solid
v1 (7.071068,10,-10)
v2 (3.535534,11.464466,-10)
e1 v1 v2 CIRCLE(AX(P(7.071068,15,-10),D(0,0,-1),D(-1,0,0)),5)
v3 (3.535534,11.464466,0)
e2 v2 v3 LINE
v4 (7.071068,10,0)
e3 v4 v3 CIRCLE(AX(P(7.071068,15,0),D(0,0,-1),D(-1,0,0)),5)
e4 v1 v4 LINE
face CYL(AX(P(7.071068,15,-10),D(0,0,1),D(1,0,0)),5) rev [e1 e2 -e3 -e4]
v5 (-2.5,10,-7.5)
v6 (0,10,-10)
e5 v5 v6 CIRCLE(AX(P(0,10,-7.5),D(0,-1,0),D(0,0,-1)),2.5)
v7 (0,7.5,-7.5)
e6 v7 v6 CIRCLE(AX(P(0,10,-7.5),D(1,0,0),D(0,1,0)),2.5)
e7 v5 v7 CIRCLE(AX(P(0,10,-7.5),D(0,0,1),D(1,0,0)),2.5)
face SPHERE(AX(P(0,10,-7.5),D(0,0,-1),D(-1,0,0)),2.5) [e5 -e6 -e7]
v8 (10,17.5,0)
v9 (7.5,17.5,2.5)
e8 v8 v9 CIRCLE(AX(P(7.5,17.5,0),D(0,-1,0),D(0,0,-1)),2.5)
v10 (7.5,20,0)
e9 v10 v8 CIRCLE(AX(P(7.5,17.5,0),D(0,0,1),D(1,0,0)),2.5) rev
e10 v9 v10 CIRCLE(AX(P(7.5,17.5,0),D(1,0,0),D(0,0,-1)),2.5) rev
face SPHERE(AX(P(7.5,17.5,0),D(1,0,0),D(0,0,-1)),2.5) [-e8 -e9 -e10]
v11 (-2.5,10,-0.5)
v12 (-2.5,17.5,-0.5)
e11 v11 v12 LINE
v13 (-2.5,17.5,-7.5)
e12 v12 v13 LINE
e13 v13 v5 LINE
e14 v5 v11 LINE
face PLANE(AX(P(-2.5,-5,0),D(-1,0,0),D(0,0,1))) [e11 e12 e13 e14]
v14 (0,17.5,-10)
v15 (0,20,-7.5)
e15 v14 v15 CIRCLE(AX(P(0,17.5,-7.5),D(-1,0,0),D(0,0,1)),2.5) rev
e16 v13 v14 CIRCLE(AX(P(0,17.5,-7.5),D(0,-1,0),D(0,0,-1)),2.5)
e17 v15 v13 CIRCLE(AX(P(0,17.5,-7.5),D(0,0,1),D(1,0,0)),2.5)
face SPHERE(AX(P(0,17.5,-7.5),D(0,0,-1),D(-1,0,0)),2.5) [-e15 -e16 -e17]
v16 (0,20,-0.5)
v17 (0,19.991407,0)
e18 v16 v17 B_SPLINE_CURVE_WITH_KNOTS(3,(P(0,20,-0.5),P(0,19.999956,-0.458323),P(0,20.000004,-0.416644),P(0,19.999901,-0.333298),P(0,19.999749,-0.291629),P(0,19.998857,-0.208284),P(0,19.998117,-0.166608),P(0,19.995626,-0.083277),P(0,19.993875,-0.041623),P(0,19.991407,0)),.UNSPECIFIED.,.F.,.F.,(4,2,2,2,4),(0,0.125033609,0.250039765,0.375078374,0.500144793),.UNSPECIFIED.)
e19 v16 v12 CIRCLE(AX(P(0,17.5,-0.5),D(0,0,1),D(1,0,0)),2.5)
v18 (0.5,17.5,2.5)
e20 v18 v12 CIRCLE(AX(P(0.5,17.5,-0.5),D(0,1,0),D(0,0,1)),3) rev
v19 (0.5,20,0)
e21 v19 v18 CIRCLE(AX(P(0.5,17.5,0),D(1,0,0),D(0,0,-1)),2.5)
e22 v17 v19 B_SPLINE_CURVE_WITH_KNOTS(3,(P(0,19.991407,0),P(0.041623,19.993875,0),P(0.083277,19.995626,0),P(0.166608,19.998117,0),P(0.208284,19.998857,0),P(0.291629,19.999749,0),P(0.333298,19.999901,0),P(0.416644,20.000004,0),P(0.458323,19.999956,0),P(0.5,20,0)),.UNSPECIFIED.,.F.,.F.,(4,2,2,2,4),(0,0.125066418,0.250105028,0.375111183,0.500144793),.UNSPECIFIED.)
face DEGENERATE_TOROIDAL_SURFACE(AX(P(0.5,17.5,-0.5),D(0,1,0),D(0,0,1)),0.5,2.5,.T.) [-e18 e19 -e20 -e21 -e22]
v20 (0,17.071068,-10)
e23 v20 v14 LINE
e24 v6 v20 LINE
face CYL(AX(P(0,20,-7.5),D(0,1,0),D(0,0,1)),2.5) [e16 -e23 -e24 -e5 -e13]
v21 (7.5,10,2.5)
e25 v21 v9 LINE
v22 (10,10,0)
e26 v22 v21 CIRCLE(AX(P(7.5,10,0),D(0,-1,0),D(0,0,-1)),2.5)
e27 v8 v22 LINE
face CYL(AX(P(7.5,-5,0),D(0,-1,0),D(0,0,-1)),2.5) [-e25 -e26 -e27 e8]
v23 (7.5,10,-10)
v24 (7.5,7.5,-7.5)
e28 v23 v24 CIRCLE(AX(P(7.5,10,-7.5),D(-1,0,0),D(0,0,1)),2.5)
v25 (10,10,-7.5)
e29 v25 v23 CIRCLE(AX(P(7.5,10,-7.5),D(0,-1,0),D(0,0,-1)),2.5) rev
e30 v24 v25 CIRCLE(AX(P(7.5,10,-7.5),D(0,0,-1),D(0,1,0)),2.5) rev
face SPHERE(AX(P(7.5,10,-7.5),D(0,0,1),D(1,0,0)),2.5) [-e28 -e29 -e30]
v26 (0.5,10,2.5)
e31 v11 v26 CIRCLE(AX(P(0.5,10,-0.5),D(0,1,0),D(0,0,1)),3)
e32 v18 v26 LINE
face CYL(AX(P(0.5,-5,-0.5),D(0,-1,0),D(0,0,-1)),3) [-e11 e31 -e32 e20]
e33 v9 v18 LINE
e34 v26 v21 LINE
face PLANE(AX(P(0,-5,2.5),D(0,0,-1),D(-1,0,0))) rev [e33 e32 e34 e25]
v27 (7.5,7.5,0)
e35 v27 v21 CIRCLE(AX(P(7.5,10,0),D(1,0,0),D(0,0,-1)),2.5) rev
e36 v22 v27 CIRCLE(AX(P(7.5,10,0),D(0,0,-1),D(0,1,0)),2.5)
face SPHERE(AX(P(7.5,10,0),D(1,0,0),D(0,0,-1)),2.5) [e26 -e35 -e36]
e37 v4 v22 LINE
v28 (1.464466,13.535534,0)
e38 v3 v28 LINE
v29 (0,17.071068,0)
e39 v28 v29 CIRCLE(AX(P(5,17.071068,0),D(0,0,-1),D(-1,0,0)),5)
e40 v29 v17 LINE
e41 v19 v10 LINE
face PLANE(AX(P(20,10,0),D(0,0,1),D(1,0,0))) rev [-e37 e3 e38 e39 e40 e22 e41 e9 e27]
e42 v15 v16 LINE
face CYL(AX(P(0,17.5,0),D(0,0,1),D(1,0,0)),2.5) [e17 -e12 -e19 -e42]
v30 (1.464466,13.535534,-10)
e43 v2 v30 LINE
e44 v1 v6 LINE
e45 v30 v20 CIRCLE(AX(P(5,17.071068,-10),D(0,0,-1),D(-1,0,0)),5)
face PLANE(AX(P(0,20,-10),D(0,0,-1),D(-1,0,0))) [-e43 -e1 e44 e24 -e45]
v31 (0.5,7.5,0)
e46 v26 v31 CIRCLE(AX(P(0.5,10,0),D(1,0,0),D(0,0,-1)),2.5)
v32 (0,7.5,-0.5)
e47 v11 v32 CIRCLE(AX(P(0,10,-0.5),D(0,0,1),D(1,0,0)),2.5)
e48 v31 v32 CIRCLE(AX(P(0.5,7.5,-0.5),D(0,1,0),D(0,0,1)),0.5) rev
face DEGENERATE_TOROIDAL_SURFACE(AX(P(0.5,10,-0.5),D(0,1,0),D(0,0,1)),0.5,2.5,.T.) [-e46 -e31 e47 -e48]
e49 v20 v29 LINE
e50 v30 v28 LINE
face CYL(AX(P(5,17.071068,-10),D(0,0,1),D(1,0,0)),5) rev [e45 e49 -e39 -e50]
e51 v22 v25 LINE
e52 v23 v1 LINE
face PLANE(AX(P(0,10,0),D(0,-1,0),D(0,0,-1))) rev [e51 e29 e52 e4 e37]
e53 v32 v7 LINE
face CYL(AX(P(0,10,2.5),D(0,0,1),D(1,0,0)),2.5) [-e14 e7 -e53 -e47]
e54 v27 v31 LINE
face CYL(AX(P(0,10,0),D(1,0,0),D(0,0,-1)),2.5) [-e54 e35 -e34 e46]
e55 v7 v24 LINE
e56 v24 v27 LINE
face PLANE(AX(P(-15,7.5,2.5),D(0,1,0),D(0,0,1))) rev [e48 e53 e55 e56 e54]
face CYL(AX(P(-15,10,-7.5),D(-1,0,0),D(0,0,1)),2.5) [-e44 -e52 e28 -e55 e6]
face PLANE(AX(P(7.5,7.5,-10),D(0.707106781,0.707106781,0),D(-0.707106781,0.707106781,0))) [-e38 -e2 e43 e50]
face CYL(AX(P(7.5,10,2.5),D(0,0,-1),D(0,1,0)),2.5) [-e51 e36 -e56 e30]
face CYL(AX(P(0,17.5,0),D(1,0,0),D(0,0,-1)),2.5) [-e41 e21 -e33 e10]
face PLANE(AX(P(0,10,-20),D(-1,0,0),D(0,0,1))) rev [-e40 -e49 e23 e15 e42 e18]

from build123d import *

# Parameters (mm, degrees)
SKETCH1_W           = 10
SKETCH1_H           = 10
BOSS_EXTRUDE1_DEPTH = 20
SKETCH2_W           = 20
SKETCH2_H           = 20
CUT_EXTRUDE1_DEPTH  = 10
BOSS_EXTRUDE2_DEPTH = 10
CUT_EXTRUDE2_DEPTH  = 25
SKETCH5_W           = 12.5
SKETCH5_H           = 7.5
CUT_EXTRUDE3_DEPTH  = 25
FILLET6_R           = 3
FILLET7_R           = 2.5
FILLET8_R           = 2.5
FILLET9_R           = 2.5
FILLET10_R          = 2.5


# Some blends are built 0.0001 mm under size
with BuildPart() as part:
    # Sketch1 → Boss-Extrude1 (new body)
    with BuildSketch(Plane(origin=(0, 0, 0), x_dir=(1, 0, 0), z_dir=(0, 1, 0))):
        Polygon((0, 10), (-10, 10), (-10, -10), (10, -10), (10, 0), (0, 0), align=None)
        with Locations((5, 5)):
            Rectangle(SKETCH1_W, SKETCH1_H)
    extrude(amount=BOSS_EXTRUDE1_DEPTH)

    # Sketch2 → Cut-Extrude1 (cut)
    with BuildSketch(Plane(origin=(0, 20, 0), x_dir=(1, 0, 0), z_dir=(0, 1, 0))):
        with Locations((10, 10)):
            Rectangle(SKETCH2_W, SKETCH2_H)
    extrude(amount=-CUT_EXTRUDE1_DEPTH, mode=Mode.SUBTRACT)

    # Sketch3 → Boss-Extrude2 (add)
    with BuildSketch(Plane(origin=(0, 0, 0), x_dir=(-1, 0, 0), z_dir=(0, 0, -1))):
        with BuildLine():
            Line((-1.464466094, 13.535533906), (-3.535533906, 11.464466094))
            ThreePointArc((-3.535533906, 11.464466094), (-5.15765065, 10.380602337), (-7.071067812, 10))
            Line((-7.071067812, 10), (0, 10))
            Line((0, 10), (0, 17.071067812))
            ThreePointArc((0, 17.071067812), (-0.380602337, 15.15765065), (-1.464466094, 13.535533906))
        make_face()
    extrude(amount=BOSS_EXTRUDE2_DEPTH)

    # Sketch4 → Cut-Extrude2 (cut)
    with BuildSketch(Plane(origin=(0, 20, 0), x_dir=(1, 0, 0), z_dir=(0, 1, 0))):
        Polygon((-2.5, -2.5), (-2.5, 10), (-10, 10), (-10, -10), (10, -10), (10, -2.5), align=None)
    extrude(amount=-CUT_EXTRUDE2_DEPTH, mode=Mode.SUBTRACT)

    # Sketch5 → Cut-Extrude3 (cut)
    with BuildSketch(Plane(origin=(10, 0, 0), x_dir=(0, 0, -1), z_dir=(1, 0, 0))):
        with Locations((3.75, 3.75)):
            Rectangle(SKETCH5_W, SKETCH5_H)
    extrude(amount=-CUT_EXTRUDE3_DEPTH, mode=Mode.SUBTRACT)

    # Fillet6
    fillet6_edges = [part.edges().sort_by_distance(p)[0] for p in [
        (-2.5, 13.75, 2.5),
    ]]
    fillet(fillet6_edges, radius=FILLET6_R)

    # Fillet7
    # the kernel refuses this fillet: 2.5 mm, written as the material it takes off along each edge
    with BuildSketch(Plane(origin=(16.25, 20, 2.5), x_dir=(0, 0, -1), z_dir=(-1, 0, 0)), Plane(origin=(-2.5, 20, -0.5), x_dir=(1, 0, 0), z_dir=(0, 0, -1))) as fillet7_piece_1:
        with BuildLine():
            CenterArc((FILLET7_R, FILLET7_R), FILLET7_R, 180, 90)
            Line((0, FILLET7_R), (0, 0))
            Line((0, 0), (FILLET7_R, 0))
        make_face()
    extrude(amount=15.75, mode=Mode.SUBTRACT)
    with BuildSketch(Plane(origin=(0.5, 20, -0.5), x_dir=(-1, 0, 0), z_dir=(0, 0, -1))) as fillet7_piece_2:
        with BuildLine():
            CenterArc((3 - FILLET7_R, -FILLET7_R), FILLET7_R, 0, 90)
            Line((3, -FILLET7_R), (3, 0))
            Line((3, 0), (3 - FILLET7_R, 0))
        make_face()
    revolve(axis=Axis((0.5, 20, -0.5), (0, 1, 0)), revolution_arc=90, mode=Mode.SUBTRACT)

    # Fillet8
    fillet8_edges = [part.edges().sort_by_distance(p)[0] for p in [
        (-2.5, 7.5, -5.25),
        (5.25, 7.5, 2.5),
        (-1.621320344, 7.5, 1.621320344),
    ]]
    fillet(fillet8_edges, radius=FILLET8_R)

    # Fillet9
    fillet9_edges = [part.edges().sort_by_distance(p)[0] for p in [
        (5, 7.5, -10),
        (-1.767766953, 19.267766953, -10),
        (-2.5, 13.75, -10),
        (10, 19.267766953, 1.767766953),
        (10, 13.75, 2.5),
        (10, 7.5, -5),
        (-1.767766953, 8.232233047, -10),
        (10, 8.232233047, 1.767766953),
    ]]
    fillet(fillet9_edges, radius=FILLET9_R - 0.0001)  # a hair under: the kernel refuses the full size

    # Fillet10
    # the kernel refuses this fillet: 2.5 mm, written as the material it takes off along each edge
    with BuildSketch(Plane(origin=(7.5, 7.5, -7.5), x_dir=(0, 0, -1), z_dir=(-1, 0, 0))) as fillet10_piece_1:
        with BuildLine():
            CenterArc((0.0001, -2.4999), 2.4999, 0, 90)
            Line((2.5, -2.4999), (2.5, 0))
            Line((2.5, 0), (0.0001, 0))
        make_face()
    revolve(axis=Axis((7.5, 7.5, -7.5), (0, -1, 0)), revolution_arc=90, mode=Mode.SUBTRACT)
    with BuildSketch(Plane(origin=(10, 7.5, -10), x_dir=(-1, 0, 0), z_dir=(0, 1, 0))) as fillet10_piece_2:
        with BuildLine():
            CenterArc((FILLET10_R, FILLET10_R), FILLET10_R, 180, 90)
            Line((0, FILLET10_R), (0, 0))
            Line((0, 0), (FILLET10_R, 0))
        make_face()
    extrude(amount=8.75, mode=Mode.SUBTRACT)


solid = part.part
